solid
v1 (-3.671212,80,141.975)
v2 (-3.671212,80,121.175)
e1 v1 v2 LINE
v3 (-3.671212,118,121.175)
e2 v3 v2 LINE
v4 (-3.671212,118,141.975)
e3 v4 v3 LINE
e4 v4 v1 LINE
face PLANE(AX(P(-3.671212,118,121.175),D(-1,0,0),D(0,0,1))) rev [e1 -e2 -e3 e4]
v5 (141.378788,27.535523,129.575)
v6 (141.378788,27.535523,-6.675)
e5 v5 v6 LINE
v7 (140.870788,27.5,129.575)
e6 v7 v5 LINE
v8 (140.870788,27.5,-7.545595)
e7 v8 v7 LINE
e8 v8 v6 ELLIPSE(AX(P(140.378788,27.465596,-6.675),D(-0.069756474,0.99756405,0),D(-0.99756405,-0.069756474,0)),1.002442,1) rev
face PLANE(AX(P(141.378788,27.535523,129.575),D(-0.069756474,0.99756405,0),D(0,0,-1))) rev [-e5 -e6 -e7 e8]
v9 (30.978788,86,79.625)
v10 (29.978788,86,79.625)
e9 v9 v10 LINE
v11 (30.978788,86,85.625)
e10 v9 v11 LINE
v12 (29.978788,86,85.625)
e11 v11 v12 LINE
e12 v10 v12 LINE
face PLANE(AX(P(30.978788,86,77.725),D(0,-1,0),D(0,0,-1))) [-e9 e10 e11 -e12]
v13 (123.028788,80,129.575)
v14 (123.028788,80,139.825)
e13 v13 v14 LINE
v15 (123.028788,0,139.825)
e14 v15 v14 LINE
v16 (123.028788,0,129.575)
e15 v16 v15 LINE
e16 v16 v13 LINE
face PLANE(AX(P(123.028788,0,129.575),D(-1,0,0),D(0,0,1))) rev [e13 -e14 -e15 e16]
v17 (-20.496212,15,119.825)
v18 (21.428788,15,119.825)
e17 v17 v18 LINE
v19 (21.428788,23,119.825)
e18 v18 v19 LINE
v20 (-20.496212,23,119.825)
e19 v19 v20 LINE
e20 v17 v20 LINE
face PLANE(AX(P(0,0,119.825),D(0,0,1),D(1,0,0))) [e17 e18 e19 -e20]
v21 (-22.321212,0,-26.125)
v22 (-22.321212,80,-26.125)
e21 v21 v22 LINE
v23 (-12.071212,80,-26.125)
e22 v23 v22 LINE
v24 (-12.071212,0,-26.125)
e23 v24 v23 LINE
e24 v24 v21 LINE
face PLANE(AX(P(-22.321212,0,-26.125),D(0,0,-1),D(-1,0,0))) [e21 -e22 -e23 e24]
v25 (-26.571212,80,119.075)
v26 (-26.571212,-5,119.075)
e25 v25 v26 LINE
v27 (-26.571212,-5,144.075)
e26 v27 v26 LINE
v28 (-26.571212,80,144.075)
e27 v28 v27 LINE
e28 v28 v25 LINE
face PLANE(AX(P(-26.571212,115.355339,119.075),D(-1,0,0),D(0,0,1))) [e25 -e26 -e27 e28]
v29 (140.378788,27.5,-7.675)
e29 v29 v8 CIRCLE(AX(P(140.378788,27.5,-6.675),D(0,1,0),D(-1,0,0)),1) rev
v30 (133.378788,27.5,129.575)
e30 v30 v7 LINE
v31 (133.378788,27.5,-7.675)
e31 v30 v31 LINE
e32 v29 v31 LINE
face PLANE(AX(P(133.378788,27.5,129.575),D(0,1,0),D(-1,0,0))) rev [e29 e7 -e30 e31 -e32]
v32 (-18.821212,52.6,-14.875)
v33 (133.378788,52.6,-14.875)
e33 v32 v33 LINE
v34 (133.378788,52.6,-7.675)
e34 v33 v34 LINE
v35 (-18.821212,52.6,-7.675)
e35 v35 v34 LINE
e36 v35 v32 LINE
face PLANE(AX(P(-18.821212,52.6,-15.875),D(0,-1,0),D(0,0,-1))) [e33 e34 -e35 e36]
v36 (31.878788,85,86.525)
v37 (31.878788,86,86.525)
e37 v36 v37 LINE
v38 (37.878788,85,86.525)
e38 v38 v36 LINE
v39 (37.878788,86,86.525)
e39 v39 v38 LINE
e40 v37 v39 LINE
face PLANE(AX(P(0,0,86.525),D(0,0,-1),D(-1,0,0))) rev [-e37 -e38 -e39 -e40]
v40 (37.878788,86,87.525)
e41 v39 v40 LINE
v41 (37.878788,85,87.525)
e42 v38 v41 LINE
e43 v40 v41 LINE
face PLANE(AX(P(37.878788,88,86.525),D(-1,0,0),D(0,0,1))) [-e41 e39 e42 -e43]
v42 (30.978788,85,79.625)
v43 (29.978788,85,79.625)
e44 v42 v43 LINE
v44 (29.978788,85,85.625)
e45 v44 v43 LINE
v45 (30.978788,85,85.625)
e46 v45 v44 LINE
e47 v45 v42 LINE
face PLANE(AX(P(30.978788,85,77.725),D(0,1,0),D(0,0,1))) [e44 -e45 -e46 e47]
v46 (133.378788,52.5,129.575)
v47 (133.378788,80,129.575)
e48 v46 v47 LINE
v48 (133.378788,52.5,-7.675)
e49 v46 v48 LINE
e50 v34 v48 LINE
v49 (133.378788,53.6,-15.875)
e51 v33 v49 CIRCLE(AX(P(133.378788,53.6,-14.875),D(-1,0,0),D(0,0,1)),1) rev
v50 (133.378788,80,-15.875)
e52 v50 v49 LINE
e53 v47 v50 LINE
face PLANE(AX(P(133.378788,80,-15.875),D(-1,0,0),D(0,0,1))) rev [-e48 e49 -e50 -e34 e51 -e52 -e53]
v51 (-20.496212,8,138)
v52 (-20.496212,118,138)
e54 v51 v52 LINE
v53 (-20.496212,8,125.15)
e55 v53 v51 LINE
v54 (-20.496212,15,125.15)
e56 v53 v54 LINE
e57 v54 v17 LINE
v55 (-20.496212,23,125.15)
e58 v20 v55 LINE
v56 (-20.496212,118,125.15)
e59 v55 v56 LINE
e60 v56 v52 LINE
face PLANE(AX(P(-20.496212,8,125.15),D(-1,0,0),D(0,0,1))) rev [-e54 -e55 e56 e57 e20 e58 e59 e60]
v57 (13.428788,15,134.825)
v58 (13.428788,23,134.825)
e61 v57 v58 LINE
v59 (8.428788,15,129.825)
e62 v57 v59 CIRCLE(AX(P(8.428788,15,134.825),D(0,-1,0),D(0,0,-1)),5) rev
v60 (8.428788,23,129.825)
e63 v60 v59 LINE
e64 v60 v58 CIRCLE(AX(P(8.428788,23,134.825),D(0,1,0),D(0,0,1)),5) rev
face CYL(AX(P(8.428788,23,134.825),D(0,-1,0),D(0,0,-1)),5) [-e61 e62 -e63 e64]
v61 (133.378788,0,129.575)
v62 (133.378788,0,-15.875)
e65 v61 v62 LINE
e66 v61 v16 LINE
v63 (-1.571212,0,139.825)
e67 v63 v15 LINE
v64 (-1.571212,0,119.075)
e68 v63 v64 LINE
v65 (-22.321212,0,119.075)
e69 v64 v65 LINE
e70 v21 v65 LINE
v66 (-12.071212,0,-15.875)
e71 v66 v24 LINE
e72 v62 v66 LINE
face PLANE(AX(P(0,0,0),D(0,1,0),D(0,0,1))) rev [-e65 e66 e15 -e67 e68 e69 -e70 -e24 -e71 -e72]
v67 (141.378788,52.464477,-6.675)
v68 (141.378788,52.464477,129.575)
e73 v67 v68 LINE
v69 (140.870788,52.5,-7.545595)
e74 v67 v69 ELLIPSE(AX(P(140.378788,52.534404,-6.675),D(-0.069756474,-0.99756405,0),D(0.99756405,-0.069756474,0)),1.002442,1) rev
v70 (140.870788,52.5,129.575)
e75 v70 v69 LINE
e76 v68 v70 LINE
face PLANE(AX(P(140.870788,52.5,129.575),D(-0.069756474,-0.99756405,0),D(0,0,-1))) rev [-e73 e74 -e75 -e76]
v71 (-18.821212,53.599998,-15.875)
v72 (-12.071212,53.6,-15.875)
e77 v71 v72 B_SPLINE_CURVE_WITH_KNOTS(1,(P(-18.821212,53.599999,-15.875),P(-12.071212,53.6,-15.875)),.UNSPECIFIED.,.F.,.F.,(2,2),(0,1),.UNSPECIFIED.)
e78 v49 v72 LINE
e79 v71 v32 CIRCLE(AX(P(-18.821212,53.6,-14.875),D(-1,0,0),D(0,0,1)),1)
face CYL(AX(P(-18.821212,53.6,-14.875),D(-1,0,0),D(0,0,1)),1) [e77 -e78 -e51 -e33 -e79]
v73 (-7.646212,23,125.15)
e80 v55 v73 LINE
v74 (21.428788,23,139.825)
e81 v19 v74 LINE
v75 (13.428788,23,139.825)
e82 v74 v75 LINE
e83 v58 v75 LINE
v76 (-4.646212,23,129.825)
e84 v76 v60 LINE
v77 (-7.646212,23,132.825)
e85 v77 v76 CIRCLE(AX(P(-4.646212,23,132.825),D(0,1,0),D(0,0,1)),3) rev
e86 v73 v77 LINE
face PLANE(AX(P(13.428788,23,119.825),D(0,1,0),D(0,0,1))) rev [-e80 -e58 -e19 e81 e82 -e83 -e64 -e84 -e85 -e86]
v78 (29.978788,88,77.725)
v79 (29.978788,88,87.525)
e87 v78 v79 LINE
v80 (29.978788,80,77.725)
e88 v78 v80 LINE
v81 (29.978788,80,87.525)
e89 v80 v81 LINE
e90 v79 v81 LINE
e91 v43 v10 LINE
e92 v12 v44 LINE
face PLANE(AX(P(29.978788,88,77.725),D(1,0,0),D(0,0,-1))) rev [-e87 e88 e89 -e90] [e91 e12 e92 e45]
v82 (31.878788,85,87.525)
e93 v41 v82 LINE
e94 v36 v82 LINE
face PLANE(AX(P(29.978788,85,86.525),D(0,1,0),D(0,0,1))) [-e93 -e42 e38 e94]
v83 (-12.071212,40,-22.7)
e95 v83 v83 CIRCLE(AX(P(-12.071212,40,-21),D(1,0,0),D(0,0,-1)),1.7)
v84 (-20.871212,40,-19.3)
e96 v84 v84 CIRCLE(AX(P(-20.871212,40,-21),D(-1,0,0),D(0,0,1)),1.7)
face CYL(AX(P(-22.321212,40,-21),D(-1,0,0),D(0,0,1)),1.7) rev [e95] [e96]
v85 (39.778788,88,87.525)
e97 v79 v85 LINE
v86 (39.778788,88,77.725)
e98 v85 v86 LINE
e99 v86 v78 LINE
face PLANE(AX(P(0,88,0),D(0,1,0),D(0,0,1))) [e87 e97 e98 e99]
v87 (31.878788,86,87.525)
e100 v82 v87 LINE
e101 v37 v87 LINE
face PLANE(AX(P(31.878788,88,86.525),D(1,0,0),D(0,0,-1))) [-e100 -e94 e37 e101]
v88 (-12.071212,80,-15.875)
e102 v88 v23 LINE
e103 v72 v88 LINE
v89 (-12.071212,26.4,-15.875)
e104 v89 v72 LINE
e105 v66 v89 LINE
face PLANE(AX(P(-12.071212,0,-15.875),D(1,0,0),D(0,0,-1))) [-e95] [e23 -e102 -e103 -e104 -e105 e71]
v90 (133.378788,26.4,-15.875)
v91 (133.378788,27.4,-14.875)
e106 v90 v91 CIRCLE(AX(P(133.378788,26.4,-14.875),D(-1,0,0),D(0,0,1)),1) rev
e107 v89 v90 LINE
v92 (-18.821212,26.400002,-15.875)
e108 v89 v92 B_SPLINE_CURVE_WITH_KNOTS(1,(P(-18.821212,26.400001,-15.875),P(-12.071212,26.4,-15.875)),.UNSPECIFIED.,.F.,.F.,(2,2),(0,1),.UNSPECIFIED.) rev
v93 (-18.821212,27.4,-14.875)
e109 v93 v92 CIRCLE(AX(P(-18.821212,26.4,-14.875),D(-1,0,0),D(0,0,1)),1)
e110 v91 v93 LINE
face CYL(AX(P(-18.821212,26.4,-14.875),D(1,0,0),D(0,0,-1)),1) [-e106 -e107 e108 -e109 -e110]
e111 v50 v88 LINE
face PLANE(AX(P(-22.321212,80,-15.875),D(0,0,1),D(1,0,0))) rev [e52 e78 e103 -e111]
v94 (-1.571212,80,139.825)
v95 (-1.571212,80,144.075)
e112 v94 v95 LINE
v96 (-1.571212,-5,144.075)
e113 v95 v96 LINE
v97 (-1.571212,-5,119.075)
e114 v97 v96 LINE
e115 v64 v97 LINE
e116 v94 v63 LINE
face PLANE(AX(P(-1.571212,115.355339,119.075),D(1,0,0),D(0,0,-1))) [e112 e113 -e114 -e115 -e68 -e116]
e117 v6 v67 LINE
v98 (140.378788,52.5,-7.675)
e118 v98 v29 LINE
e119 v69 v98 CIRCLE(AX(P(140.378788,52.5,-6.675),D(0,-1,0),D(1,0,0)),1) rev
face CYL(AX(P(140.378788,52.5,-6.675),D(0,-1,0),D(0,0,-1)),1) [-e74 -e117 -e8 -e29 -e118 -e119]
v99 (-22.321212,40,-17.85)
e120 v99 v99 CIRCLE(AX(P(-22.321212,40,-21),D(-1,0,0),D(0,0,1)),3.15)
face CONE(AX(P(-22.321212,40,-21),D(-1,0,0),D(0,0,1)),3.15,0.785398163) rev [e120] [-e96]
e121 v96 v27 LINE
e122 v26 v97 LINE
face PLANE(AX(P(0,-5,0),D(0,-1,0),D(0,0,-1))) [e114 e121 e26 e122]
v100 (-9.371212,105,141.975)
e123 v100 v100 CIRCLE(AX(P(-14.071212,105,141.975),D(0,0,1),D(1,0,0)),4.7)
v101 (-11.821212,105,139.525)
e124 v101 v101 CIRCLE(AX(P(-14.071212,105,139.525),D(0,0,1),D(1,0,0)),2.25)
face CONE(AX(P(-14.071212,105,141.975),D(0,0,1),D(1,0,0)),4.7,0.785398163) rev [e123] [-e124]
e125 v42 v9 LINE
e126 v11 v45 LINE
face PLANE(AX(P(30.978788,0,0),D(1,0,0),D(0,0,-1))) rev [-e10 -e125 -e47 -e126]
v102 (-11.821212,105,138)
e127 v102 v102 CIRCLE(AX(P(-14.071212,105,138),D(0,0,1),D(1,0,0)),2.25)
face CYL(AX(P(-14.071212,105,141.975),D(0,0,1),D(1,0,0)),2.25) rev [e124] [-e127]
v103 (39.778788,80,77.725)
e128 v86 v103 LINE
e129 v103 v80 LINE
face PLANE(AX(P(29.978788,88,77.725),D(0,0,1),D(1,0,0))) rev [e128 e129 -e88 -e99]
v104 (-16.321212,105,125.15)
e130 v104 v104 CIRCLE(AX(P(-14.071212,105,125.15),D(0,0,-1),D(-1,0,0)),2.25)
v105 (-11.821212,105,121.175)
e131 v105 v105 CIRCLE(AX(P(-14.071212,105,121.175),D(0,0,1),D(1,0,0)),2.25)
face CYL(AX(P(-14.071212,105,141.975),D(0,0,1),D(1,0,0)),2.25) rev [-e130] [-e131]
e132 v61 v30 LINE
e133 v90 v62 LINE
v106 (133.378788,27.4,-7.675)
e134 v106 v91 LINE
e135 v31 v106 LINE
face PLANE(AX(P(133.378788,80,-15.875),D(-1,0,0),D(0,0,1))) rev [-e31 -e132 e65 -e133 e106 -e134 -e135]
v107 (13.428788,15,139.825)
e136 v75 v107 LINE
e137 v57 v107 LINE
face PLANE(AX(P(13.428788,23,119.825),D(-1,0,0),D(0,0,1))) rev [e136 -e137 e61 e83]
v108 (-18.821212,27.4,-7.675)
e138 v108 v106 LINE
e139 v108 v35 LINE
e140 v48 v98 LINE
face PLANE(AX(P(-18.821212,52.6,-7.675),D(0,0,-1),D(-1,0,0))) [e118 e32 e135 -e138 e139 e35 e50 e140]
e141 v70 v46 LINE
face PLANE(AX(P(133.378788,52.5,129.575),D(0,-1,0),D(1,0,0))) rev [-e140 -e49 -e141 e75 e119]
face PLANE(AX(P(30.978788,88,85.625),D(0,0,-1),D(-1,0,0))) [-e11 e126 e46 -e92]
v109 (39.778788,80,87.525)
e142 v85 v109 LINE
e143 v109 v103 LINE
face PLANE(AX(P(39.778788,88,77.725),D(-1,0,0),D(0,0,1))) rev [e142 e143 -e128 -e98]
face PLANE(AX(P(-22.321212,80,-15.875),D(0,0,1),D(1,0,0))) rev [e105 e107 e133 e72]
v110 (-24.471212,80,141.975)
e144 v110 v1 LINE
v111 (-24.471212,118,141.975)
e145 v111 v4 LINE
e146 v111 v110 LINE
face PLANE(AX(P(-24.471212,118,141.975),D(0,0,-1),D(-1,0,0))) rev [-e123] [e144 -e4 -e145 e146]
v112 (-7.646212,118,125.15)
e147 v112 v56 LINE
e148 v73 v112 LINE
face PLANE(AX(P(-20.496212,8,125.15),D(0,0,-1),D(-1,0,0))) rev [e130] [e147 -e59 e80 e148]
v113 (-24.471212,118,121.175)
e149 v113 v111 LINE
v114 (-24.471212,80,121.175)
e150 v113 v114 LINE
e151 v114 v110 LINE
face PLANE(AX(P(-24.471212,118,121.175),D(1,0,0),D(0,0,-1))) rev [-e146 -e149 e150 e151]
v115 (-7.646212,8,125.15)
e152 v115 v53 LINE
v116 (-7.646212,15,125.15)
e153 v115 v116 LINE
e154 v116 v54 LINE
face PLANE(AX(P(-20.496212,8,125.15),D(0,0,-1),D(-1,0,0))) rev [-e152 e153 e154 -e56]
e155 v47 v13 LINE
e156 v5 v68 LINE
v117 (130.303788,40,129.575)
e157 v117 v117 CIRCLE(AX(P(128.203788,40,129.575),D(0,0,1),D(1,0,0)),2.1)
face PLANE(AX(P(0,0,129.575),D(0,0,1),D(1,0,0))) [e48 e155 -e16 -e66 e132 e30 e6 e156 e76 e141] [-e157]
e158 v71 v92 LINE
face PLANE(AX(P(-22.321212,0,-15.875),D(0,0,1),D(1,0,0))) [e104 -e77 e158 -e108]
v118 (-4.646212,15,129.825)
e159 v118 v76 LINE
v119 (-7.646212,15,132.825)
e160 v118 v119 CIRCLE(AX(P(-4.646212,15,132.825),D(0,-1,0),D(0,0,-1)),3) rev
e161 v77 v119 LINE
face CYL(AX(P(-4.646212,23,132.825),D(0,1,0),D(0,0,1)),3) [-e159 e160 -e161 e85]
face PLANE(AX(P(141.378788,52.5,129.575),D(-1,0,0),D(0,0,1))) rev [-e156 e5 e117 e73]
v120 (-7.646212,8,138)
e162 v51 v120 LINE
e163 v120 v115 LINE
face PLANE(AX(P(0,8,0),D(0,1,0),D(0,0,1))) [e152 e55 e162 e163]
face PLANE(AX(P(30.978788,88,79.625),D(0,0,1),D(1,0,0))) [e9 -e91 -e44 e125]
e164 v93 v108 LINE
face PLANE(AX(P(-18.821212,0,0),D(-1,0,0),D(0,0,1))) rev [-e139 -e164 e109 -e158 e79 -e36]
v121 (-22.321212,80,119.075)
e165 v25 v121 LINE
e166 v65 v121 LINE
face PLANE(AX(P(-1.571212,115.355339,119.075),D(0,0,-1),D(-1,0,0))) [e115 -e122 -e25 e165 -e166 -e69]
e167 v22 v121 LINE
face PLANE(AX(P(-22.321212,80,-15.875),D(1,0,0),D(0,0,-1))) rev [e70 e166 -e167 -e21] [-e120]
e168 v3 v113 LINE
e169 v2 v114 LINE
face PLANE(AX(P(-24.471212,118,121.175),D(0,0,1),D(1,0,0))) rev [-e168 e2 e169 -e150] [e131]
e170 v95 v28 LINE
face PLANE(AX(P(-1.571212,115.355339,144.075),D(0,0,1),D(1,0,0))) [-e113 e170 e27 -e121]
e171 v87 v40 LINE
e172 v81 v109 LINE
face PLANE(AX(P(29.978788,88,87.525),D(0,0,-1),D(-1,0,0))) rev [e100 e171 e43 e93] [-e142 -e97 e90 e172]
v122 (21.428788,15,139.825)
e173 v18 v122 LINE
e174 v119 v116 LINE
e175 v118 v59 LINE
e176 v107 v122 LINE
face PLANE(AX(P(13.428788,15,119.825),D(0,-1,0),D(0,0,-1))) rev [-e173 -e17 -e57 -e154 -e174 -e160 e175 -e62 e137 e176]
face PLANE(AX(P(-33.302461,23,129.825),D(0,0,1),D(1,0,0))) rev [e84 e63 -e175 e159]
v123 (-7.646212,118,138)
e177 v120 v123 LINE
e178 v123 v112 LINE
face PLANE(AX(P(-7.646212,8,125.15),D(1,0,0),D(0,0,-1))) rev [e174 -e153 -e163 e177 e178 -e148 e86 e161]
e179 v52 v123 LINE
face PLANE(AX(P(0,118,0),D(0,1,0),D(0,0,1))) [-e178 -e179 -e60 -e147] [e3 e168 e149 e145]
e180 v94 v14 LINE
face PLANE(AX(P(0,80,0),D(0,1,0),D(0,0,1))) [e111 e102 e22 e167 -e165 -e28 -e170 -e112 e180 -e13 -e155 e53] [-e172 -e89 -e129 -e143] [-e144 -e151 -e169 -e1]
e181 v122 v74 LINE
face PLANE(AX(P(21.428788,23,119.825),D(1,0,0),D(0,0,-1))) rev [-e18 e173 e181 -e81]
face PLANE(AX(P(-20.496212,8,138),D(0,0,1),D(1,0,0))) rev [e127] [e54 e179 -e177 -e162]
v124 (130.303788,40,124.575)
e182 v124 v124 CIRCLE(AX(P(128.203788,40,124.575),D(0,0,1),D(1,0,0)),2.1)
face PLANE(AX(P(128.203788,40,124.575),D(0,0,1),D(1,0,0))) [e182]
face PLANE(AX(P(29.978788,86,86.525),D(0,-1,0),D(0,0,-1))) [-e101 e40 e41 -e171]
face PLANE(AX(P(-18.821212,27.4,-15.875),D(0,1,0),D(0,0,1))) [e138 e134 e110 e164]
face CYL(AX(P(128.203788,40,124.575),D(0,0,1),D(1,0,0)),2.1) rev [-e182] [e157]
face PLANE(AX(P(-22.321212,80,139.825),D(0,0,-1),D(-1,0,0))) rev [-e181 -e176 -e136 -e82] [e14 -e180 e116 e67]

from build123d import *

# Parameters (mm, degrees)
SKETCH1_W                                           = 155.7
SKETCH1_H                                           = 155.7
BOSS_EXTRUDE2_DEPTH                                 = 80
SKETCH3_W                                           = 8
SKETCH3_H                                           = 25
BOSS_EXTRUDE4_DEPTH                                 = 145.45
CHAMFER1_SIZE                                       = 0.508
CHAMFER1_SIZE2                                      = 0.03552282
CHAMFER2_SIZE                                       = 0.508
CHAMFER2_SIZE2                                      = 0.03552282
SKETCH4_W                                           = 8.2
SKETCH4_H                                           = 25.2
CUT_EXTRUDE6_DEPTH                                  = 160.2
FILLET1_R                                           = 1
SKETCH6_W                                           = 10.35
SKETCH6_H                                           = 10.25
CUT_EXTRUDE7_DEPTH                                  = 80
SKETCH7_W                                           = 10.25
SKETCH7_H                                           = 10.25
BOSS_EXTRUDE5_DEPTH                                 = 80
CSK_FOR_M3_COUNTERSUNK_FLAT_HEAD_SCREW1_D           = 3.4
CSK_FOR_M3_COUNTERSUNK_FLAT_HEAD_SCREW1_DEPTH       = 16
CSK_FOR_M3_COUNTERSUNK_FLAT_HEAD_SCREW1_CSINK_D     = 6.3
CSK_FOR_M3_COUNTERSUNK_FLAT_HEAD_SCREW1_CSINK_ANGLE = 90
CSK_FOR_M3_COUNTERSUNK_FLAT_HEAD_SCREW1_TIP         = 1.021463052
SKETCH12_R                                          = 2.1
CUT_EXTRUDE9_DEPTH                                  = 5
FILLET2_START                                       = -18.821212121
FILLET2_DEPTH                                       = 152.821212121
FILLET3_START                                       = -18.821212121
FILLET3_DEPTH                                       = 152.821212121
SKETCH14_W                                          = 9.8
SKETCH14_H                                          = 9.8
BOSS_EXTRUDE6_DEPTH                                 = 8
CUT_EXTRUDE12_START                                 = -9.8
SKETCH17_W                                          = 6
SKETCH17_H                                          = 1
CUT_EXTRUDE12_DEPTH                                 = 1
CUT_EXTRUDE13_START                                 = -9.8
SKETCH19_W                                          = 6
SKETCH19_H                                          = 1
CUT_EXTRUDE13_DEPTH                                 = 1
BOSS_EXTRUDE7_DEPTH                                 = 5
BOSS_EXTRUDE7_DEPTH_BACK                            = 80
SKETCH20_W                                          = 25
SKETCH20_H                                          = 25
SKETCH21_W                                          = 20.8
SKETCH21_H                                          = 20.8
BOSS_EXTRUDE8_DEPTH                                 = 38
SKETCH23_W                                          = 12.85
SKETCH23_H                                          = 12.85
CUT_EXTRUDE14_DEPTH                                 = 110
CSK_FOR_M4_COUNTERSUNK_FLAT_HEAD_SCREW1_D           = 4.5
CSK_FOR_M4_COUNTERSUNK_FLAT_HEAD_SCREW1_DEPTH       = 26
CSK_FOR_M4_COUNTERSUNK_FLAT_HEAD_SCREW1_CSINK_D     = 9.4
CSK_FOR_M4_COUNTERSUNK_FLAT_HEAD_SCREW1_CSINK_ANGLE = 90
CSK_FOR_M4_COUNTERSUNK_FLAT_HEAD_SCREW1_TIP         = 1.351936393
SKETCH27_W                                          = 8
SKETCH27_H                                          = 8
CUT_EXTRUDE15_DEPTH                                 = 20
SKETCH28_W                                          = 10
SKETCH28_H                                          = 8
CUT_EXTRUDE16_DEPTH                                 = 33.925
FILLET4_R                                           = 5
FILLET5_R                                           = 3


with BuildPart() as part:
    # Sketch1 → Boss-Extrude2 (new body)
    with BuildSketch(Plane(origin=(0, 0, 0), x_dir=(1, 0, 0), z_dir=(0, 1, 0))):
        with Locations((55.528787879, -61.975)):
            Rectangle(SKETCH1_W, SKETCH1_H)
    extrude(amount=BOSS_EXTRUDE2_DEPTH)

    # Sketch3 → Boss-Extrude4 (add)
    with BuildSketch(Plane.XY.offset(-15.875)):
        with Locations((137.378787879, 40)):
            Rectangle(SKETCH3_W, SKETCH3_H)
    extrude(amount=BOSS_EXTRUDE4_DEPTH)

    # Chamfer1
    chamfer1_edges = [part.edges().sort_by_distance(p)[0] for p in [
        (141.378787879, 52.5, 56.85),
    ]]
    chamfer1_side = [part.faces().sort_by_distance(p)[0] for p in [
        (137.378787879, 52.5, 56.85),
    ]]
    chamfer(chamfer1_edges, length=CHAMFER1_SIZE, length2=CHAMFER1_SIZE2, reference=chamfer1_side[0])

    # Chamfer2
    chamfer2_edges = [part.edges().sort_by_distance(p)[0] for p in [
        (141.378787879, 27.5, 56.85),
    ]]
    chamfer2_side = [part.faces().sort_by_distance(p)[0] for p in [
        (137.378787879, 27.5, 56.85),
    ]]
    chamfer(chamfer2_edges, length=CHAMFER2_SIZE, length2=CHAMFER2_SIZE2, reference=chamfer2_side[0])

    # Sketch4 → Cut-Extrude6 (cut)
    with BuildSketch(Plane.ZY.offset(-141.378787879)):
        with Locations((-11.775, 40)):
            Rectangle(SKETCH4_W, SKETCH4_H)
    extrude(amount=CUT_EXTRUDE6_DEPTH, mode=Mode.SUBTRACT)

    # Fillet1
    fillet1_edges = [part.edges().sort_by_distance(p)[0] for p in [
        (141.378787879, 40, -7.675),
    ]]
    fillet(fillet1_edges, radius=FILLET1_R)

    # Sketch6 → Cut-Extrude7 (cut)
    with BuildSketch(Plane(origin=(0, 80, 0), x_dir=(1, 0, 0), z_dir=(0, 1, 0))):
        with Locations((128.203787879, -134.7)):
            Rectangle(SKETCH6_W, SKETCH6_H)
    extrude(amount=-CUT_EXTRUDE7_DEPTH, mode=Mode.SUBTRACT)

    # Sketch7 → Boss-Extrude5 (add)
    with BuildSketch(Plane(origin=(0, 80, 0), x_dir=(1, 0, 0), z_dir=(0, 1, 0))):
        with Locations((-17.196212121, 21)):
            Rectangle(SKETCH7_W, SKETCH7_H)
    extrude(amount=-BOSS_EXTRUDE5_DEPTH)

    # CSK for M3 Countersunk Flat Head Screw1
    with Locations(Plane.ZY.offset(22.321212121)):
        with Locations((-21, 40)):
            CounterSinkHole(CSK_FOR_M3_COUNTERSUNK_FLAT_HEAD_SCREW1_D / 2, CSK_FOR_M3_COUNTERSUNK_FLAT_HEAD_SCREW1_CSINK_D / 2, depth=CSK_FOR_M3_COUNTERSUNK_FLAT_HEAD_SCREW1_DEPTH, counter_sink_angle=CSK_FOR_M3_COUNTERSUNK_FLAT_HEAD_SCREW1_CSINK_ANGLE)
            with Locations((0, 0, -(CSK_FOR_M3_COUNTERSUNK_FLAT_HEAD_SCREW1_DEPTH + CSK_FOR_M3_COUNTERSUNK_FLAT_HEAD_SCREW1_TIP / 2))):  # 118° drill point
                Cone(0, CSK_FOR_M3_COUNTERSUNK_FLAT_HEAD_SCREW1_D / 2, CSK_FOR_M3_COUNTERSUNK_FLAT_HEAD_SCREW1_TIP, mode=Mode.SUBTRACT)

    # Sketch12 → Cut-Extrude9 (cut)
    with BuildSketch(Plane.XY.offset(129.575)):
        with Locations((128.203787879, 40)):
            Circle(SKETCH12_R)
    extrude(amount=-CUT_EXTRUDE9_DEPTH, mode=Mode.SUBTRACT)

    # Fillet2: read off the stored shape, not the designer's step
    # Fillet2 outline → Fillet2 (cut)
    with BuildSketch(Plane.YZ.offset(FILLET2_START)):
        with BuildLine():
            Line((52.6, -15.875), (53.6, -15.875))
            ThreePointArc((53.6, -15.875), (52.892893219, -15.582106781), (52.6, -14.875))
            Line((52.6, -14.875), (52.6, -15.875))
        make_face()
    extrude(amount=FILLET2_DEPTH, mode=Mode.SUBTRACT)

    # Fillet3: read off the stored shape, not the designer's step
    # Fillet3 outline → Fillet3 (cut)
    with BuildSketch(Plane.YZ.offset(FILLET3_START)):
        with BuildLine():
            ThreePointArc((27.4, -14.875), (27.107106781, -15.582106781), (26.4, -15.875))
            Line((26.4, -15.875), (27.4, -15.875))
            Line((27.4, -15.875), (27.4, -14.875))
        make_face()
    extrude(amount=FILLET3_DEPTH, mode=Mode.SUBTRACT)

    # Sketch14 → Boss-Extrude6 (add)
    with BuildSketch(Plane(origin=(0, 80, 0), x_dir=(1, 0, 0), z_dir=(0, 1, 0))):
        with Locations((34.878787879, -82.625)):
            Rectangle(SKETCH14_W, SKETCH14_H)
    extrude(amount=BOSS_EXTRUDE6_DEPTH)

    # Sketch17 → Cut-Extrude12 (cut)
    with BuildSketch(Plane(origin=(39.778787879, 0, 0), x_dir=(0, 0, -1), z_dir=(1, 0, 0)).offset(CUT_EXTRUDE12_START)):
        with Locations((-82.625, 85.5)):
            Rectangle(SKETCH17_W, SKETCH17_H)
    extrude(amount=CUT_EXTRUDE12_DEPTH, mode=Mode.SUBTRACT)

    # Sketch19 → Cut-Extrude13 (cut)
    with BuildSketch(Plane(origin=(0, 0, 77.725), x_dir=(-1, 0, 0), z_dir=(0, 0, -1)).offset(CUT_EXTRUDE13_START)):
        with Locations((-34.878787879, 85.5)):
            Rectangle(SKETCH19_W, SKETCH19_H)
    extrude(amount=CUT_EXTRUDE13_DEPTH, mode=Mode.SUBTRACT)

    # Sketch20 → Boss-Extrude7 (add, two sides: drawn at the far end of the back side and taken through both)
    with BuildSketch(Plane(origin=(0, 0, 0), x_dir=(-1, 0, 0), z_dir=(0, -1, 0)).offset(-BOSS_EXTRUDE7_DEPTH_BACK)):
        with Locations((14.071212121, -131.575)):
            Rectangle(SKETCH20_W, SKETCH20_H)
    extrude(amount=BOSS_EXTRUDE7_DEPTH + BOSS_EXTRUDE7_DEPTH_BACK)

    # Sketch21 → Boss-Extrude8 (add)
    with BuildSketch(Plane(origin=(0, 80, 0), x_dir=(1, 0, 0), z_dir=(0, 1, 0))):
        with Locations((-14.071212121, -131.575)):
            Rectangle(SKETCH21_W, SKETCH21_H)
    extrude(amount=BOSS_EXTRUDE8_DEPTH)

    # Sketch23 → Cut-Extrude14 (cut)
    with BuildSketch(Plane(origin=(0, 118, 0), x_dir=(1, 0, 0), z_dir=(0, 1, 0))):
        with Locations((-14.071212121, -131.575)):
            Rectangle(SKETCH23_W, SKETCH23_H)
    extrude(amount=-CUT_EXTRUDE14_DEPTH, mode=Mode.SUBTRACT)

    # CSK for M4 Countersunk Flat Head Screw1
    with Locations(Plane.XY.offset(141.975)):
        with Locations((-14.071212121, 105)):
            CounterSinkHole(CSK_FOR_M4_COUNTERSUNK_FLAT_HEAD_SCREW1_D / 2, CSK_FOR_M4_COUNTERSUNK_FLAT_HEAD_SCREW1_CSINK_D / 2, depth=CSK_FOR_M4_COUNTERSUNK_FLAT_HEAD_SCREW1_DEPTH, counter_sink_angle=CSK_FOR_M4_COUNTERSUNK_FLAT_HEAD_SCREW1_CSINK_ANGLE)
            with Locations((0, 0, -(CSK_FOR_M4_COUNTERSUNK_FLAT_HEAD_SCREW1_DEPTH + CSK_FOR_M4_COUNTERSUNK_FLAT_HEAD_SCREW1_TIP / 2))):  # 118° drill point
                Cone(0, CSK_FOR_M4_COUNTERSUNK_FLAT_HEAD_SCREW1_D / 2, CSK_FOR_M4_COUNTERSUNK_FLAT_HEAD_SCREW1_TIP, mode=Mode.SUBTRACT)

    # Sketch27 → Cut-Extrude15 (cut)
    with BuildSketch(Plane.XY.offset(139.825)):
        with Locations((17.428787879, 19)):
            Rectangle(SKETCH27_W, SKETCH27_H)
    extrude(amount=-CUT_EXTRUDE15_DEPTH, mode=Mode.SUBTRACT)

    # Sketch28 → Cut-Extrude16 (cut)
    with BuildSketch(Plane(origin=(13.428787879, 0, 0), x_dir=(0, 0, -1), z_dir=(1, 0, 0))):
        with Locations((-124.825, 19)):
            Rectangle(SKETCH28_W, SKETCH28_H)
    extrude(amount=-CUT_EXTRUDE16_DEPTH, mode=Mode.SUBTRACT)

    # Fillet4
    fillet4_edges = [part.edges().sort_by_distance(p)[0] for p in [
        (13.428787879, 19, 129.825),
    ]]
    fillet(fillet4_edges, radius=FILLET4_R)

    # Fillet5
    fillet5_edges = [part.edges().sort_by_distance(p)[0] for p in [
        (-7.646212121, 19, 129.825),
    ]]
    fillet(fillet5_edges, radius=FILLET5_R)


solid = part.part
